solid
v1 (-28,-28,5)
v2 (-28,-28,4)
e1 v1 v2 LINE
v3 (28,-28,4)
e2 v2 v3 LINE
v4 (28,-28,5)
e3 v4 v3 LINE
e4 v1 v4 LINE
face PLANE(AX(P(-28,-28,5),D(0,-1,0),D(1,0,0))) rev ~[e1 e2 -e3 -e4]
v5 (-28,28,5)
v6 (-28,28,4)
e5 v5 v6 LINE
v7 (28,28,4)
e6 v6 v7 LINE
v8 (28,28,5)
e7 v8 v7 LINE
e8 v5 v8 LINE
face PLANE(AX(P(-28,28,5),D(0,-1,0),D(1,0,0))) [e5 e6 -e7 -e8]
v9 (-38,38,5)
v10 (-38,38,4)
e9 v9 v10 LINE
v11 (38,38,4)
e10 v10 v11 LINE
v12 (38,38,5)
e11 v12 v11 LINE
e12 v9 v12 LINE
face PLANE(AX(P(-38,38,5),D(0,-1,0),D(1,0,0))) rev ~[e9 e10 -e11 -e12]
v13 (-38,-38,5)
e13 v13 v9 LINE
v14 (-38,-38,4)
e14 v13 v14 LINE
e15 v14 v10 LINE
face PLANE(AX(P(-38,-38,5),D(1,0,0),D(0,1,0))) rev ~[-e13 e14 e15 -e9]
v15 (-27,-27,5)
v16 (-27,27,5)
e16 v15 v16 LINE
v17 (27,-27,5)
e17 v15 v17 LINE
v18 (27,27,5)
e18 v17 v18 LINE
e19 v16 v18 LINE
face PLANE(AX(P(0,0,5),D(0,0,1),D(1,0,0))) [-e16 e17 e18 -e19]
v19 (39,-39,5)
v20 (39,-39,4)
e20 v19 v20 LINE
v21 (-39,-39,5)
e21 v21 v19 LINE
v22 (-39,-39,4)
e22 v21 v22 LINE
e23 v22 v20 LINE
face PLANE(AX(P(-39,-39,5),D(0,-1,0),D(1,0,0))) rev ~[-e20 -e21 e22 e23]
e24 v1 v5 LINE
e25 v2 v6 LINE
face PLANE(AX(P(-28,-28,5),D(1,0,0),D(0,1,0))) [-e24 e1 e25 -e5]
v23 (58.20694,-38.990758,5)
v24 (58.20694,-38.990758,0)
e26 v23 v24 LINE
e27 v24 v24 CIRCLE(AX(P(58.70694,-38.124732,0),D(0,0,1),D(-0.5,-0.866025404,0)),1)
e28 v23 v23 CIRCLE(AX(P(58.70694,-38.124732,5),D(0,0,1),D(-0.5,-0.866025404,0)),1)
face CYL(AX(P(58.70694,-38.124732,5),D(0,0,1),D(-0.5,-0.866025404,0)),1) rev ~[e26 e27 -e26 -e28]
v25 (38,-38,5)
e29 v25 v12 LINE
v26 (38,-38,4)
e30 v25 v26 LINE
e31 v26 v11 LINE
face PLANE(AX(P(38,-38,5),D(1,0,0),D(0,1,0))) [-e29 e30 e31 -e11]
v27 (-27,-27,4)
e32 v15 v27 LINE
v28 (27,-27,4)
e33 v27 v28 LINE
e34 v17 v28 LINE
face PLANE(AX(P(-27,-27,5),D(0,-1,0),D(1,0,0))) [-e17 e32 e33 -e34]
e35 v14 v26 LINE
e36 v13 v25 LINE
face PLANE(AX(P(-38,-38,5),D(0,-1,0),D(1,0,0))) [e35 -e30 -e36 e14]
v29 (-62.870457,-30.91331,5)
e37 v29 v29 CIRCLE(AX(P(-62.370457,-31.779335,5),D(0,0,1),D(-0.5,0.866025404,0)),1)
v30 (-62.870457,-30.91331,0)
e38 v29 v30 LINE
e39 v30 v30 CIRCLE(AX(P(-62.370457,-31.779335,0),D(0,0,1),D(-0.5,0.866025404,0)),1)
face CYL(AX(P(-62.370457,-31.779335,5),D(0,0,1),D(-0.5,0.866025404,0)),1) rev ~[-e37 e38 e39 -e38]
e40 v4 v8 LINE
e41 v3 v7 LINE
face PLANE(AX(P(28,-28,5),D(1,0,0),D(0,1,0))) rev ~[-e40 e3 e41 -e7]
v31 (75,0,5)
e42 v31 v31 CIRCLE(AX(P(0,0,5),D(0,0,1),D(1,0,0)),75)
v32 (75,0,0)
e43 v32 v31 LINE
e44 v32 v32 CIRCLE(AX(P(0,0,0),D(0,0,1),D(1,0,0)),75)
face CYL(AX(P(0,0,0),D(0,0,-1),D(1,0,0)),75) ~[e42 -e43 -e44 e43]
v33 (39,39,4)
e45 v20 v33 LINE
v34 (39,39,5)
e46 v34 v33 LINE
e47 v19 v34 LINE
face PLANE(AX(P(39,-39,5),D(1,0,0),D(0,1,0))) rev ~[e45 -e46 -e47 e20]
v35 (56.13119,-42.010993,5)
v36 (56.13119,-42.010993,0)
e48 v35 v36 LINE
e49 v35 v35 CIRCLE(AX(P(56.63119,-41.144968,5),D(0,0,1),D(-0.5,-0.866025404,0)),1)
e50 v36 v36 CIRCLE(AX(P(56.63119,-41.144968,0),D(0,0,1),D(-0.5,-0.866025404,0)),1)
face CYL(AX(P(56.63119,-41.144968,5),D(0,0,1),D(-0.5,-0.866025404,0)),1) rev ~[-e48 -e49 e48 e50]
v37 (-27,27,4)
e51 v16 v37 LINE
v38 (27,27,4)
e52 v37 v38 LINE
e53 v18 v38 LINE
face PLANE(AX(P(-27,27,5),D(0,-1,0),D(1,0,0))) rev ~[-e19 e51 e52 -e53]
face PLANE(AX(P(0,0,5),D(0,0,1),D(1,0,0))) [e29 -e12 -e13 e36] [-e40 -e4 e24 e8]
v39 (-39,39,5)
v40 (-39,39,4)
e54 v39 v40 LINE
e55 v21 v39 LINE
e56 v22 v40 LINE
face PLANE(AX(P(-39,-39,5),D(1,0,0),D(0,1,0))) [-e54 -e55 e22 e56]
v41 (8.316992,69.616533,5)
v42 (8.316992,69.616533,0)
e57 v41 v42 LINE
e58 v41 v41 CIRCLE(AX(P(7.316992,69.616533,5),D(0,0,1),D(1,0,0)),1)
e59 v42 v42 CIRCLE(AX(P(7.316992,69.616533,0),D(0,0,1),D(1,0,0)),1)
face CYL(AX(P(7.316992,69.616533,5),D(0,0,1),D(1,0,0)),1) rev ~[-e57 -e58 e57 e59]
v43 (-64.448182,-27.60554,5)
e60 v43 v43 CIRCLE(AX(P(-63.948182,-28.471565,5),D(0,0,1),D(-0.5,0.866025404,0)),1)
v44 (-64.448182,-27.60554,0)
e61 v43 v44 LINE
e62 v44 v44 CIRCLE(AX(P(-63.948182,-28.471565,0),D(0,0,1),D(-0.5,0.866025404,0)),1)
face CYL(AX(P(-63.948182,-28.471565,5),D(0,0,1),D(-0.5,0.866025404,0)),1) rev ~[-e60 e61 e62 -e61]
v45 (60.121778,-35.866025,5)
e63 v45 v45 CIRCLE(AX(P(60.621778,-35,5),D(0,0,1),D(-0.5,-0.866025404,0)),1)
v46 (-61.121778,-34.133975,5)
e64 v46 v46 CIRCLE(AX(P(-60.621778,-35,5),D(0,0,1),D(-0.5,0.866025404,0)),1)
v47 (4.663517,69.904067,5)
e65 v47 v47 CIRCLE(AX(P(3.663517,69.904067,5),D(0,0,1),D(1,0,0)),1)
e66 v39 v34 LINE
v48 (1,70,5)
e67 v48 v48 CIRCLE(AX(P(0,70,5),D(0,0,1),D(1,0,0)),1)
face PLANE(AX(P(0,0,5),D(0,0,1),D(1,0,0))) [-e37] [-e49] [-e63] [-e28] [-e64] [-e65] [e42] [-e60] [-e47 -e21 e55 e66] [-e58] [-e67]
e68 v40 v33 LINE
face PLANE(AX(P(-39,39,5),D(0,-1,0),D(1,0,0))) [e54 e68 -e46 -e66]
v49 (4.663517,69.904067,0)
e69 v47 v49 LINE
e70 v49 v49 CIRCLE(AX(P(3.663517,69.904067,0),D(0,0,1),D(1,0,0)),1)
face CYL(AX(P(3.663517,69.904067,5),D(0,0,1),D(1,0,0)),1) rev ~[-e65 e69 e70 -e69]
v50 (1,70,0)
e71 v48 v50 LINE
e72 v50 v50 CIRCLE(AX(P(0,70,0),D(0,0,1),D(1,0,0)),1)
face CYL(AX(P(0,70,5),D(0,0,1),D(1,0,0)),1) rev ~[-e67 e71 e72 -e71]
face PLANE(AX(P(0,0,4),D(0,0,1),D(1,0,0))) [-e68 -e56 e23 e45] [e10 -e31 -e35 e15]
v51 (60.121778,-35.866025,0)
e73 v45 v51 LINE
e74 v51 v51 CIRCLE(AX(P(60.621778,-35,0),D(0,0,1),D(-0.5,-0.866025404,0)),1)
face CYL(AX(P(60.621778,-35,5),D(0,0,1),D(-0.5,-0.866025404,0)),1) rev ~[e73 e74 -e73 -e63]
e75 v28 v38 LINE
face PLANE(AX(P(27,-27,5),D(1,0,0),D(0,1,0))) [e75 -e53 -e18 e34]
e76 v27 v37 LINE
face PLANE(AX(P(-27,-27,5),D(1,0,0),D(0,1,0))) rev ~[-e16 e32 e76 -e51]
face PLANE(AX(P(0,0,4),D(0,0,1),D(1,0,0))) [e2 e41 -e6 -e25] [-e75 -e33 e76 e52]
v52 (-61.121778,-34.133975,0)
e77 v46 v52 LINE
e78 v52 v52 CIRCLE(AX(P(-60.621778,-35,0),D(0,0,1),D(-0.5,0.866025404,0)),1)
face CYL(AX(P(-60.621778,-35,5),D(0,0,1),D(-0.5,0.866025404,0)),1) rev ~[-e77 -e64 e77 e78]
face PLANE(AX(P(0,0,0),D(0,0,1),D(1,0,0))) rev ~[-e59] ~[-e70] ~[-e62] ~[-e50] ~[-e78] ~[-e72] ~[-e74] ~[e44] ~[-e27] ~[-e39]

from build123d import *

# Parameters (mm, degrees)
F0_R            = 75
F1_DEPTH        = 5
F2_W            = 78
F2_H            = 78
F2_W_2          = 76
F2_H_2          = 76
F2_W_3          = 56
F2_H_3          = 56
F2_W_4          = 54
F2_H_4          = 54
F3_DEPTH        = 1
F4_R            = 1
F5_DEPTH        = 5.001
F5_COPIES_COUNT = 3


# Not quite as in the source:
# - a pattern or mirror of a feature is missing from the dataset's text; its kind, count and spacing are read off the source's solid


with BuildPart() as f1:
    # F0 (on Top) → F1 (new body)
    with BuildSketch(Plane.XY):
        Circle(F0_R)
    extrude(amount=F1_DEPTH)

    # F2 (on face) → F3 (cut)
    with BuildSketch(Plane.XY.offset(5)):
        Rectangle(F2_W, F2_H)
        Rectangle(F2_W_2, F2_H_2, mode=Mode.SUBTRACT)
        Rectangle(F2_W_3, F2_H_3)
        Rectangle(F2_W_4, F2_H_4, mode=Mode.SUBTRACT)
    extrude(amount=-F3_DEPTH, mode=Mode.SUBTRACT)

    # F4 (on face) → F5 (cut, through all)
    with BuildSketch(Plane.XY.offset(5)):
        with Locations((0, 70)):
            Circle(F4_R)
        with Locations((3.663516937, 69.9040674328)):
            Circle(F4_R)
        with Locations((7.3169924287, 69.6165326758)):
            Circle(F4_R)
    f5 = extrude(amount=-F5_DEPTH, mode=Mode.SUBTRACT)

    # F5_copies: F5 ×3 about axis
    f5_copies_axis = Axis((0, 0, 0), (0, 0, 1))
    for i in range(1, F5_COPIES_COUNT):
        add(f5.rotate(f5_copies_axis, i * 360 / F5_COPIES_COUNT), mode=Mode.SUBTRACT)


solid = f1.part
